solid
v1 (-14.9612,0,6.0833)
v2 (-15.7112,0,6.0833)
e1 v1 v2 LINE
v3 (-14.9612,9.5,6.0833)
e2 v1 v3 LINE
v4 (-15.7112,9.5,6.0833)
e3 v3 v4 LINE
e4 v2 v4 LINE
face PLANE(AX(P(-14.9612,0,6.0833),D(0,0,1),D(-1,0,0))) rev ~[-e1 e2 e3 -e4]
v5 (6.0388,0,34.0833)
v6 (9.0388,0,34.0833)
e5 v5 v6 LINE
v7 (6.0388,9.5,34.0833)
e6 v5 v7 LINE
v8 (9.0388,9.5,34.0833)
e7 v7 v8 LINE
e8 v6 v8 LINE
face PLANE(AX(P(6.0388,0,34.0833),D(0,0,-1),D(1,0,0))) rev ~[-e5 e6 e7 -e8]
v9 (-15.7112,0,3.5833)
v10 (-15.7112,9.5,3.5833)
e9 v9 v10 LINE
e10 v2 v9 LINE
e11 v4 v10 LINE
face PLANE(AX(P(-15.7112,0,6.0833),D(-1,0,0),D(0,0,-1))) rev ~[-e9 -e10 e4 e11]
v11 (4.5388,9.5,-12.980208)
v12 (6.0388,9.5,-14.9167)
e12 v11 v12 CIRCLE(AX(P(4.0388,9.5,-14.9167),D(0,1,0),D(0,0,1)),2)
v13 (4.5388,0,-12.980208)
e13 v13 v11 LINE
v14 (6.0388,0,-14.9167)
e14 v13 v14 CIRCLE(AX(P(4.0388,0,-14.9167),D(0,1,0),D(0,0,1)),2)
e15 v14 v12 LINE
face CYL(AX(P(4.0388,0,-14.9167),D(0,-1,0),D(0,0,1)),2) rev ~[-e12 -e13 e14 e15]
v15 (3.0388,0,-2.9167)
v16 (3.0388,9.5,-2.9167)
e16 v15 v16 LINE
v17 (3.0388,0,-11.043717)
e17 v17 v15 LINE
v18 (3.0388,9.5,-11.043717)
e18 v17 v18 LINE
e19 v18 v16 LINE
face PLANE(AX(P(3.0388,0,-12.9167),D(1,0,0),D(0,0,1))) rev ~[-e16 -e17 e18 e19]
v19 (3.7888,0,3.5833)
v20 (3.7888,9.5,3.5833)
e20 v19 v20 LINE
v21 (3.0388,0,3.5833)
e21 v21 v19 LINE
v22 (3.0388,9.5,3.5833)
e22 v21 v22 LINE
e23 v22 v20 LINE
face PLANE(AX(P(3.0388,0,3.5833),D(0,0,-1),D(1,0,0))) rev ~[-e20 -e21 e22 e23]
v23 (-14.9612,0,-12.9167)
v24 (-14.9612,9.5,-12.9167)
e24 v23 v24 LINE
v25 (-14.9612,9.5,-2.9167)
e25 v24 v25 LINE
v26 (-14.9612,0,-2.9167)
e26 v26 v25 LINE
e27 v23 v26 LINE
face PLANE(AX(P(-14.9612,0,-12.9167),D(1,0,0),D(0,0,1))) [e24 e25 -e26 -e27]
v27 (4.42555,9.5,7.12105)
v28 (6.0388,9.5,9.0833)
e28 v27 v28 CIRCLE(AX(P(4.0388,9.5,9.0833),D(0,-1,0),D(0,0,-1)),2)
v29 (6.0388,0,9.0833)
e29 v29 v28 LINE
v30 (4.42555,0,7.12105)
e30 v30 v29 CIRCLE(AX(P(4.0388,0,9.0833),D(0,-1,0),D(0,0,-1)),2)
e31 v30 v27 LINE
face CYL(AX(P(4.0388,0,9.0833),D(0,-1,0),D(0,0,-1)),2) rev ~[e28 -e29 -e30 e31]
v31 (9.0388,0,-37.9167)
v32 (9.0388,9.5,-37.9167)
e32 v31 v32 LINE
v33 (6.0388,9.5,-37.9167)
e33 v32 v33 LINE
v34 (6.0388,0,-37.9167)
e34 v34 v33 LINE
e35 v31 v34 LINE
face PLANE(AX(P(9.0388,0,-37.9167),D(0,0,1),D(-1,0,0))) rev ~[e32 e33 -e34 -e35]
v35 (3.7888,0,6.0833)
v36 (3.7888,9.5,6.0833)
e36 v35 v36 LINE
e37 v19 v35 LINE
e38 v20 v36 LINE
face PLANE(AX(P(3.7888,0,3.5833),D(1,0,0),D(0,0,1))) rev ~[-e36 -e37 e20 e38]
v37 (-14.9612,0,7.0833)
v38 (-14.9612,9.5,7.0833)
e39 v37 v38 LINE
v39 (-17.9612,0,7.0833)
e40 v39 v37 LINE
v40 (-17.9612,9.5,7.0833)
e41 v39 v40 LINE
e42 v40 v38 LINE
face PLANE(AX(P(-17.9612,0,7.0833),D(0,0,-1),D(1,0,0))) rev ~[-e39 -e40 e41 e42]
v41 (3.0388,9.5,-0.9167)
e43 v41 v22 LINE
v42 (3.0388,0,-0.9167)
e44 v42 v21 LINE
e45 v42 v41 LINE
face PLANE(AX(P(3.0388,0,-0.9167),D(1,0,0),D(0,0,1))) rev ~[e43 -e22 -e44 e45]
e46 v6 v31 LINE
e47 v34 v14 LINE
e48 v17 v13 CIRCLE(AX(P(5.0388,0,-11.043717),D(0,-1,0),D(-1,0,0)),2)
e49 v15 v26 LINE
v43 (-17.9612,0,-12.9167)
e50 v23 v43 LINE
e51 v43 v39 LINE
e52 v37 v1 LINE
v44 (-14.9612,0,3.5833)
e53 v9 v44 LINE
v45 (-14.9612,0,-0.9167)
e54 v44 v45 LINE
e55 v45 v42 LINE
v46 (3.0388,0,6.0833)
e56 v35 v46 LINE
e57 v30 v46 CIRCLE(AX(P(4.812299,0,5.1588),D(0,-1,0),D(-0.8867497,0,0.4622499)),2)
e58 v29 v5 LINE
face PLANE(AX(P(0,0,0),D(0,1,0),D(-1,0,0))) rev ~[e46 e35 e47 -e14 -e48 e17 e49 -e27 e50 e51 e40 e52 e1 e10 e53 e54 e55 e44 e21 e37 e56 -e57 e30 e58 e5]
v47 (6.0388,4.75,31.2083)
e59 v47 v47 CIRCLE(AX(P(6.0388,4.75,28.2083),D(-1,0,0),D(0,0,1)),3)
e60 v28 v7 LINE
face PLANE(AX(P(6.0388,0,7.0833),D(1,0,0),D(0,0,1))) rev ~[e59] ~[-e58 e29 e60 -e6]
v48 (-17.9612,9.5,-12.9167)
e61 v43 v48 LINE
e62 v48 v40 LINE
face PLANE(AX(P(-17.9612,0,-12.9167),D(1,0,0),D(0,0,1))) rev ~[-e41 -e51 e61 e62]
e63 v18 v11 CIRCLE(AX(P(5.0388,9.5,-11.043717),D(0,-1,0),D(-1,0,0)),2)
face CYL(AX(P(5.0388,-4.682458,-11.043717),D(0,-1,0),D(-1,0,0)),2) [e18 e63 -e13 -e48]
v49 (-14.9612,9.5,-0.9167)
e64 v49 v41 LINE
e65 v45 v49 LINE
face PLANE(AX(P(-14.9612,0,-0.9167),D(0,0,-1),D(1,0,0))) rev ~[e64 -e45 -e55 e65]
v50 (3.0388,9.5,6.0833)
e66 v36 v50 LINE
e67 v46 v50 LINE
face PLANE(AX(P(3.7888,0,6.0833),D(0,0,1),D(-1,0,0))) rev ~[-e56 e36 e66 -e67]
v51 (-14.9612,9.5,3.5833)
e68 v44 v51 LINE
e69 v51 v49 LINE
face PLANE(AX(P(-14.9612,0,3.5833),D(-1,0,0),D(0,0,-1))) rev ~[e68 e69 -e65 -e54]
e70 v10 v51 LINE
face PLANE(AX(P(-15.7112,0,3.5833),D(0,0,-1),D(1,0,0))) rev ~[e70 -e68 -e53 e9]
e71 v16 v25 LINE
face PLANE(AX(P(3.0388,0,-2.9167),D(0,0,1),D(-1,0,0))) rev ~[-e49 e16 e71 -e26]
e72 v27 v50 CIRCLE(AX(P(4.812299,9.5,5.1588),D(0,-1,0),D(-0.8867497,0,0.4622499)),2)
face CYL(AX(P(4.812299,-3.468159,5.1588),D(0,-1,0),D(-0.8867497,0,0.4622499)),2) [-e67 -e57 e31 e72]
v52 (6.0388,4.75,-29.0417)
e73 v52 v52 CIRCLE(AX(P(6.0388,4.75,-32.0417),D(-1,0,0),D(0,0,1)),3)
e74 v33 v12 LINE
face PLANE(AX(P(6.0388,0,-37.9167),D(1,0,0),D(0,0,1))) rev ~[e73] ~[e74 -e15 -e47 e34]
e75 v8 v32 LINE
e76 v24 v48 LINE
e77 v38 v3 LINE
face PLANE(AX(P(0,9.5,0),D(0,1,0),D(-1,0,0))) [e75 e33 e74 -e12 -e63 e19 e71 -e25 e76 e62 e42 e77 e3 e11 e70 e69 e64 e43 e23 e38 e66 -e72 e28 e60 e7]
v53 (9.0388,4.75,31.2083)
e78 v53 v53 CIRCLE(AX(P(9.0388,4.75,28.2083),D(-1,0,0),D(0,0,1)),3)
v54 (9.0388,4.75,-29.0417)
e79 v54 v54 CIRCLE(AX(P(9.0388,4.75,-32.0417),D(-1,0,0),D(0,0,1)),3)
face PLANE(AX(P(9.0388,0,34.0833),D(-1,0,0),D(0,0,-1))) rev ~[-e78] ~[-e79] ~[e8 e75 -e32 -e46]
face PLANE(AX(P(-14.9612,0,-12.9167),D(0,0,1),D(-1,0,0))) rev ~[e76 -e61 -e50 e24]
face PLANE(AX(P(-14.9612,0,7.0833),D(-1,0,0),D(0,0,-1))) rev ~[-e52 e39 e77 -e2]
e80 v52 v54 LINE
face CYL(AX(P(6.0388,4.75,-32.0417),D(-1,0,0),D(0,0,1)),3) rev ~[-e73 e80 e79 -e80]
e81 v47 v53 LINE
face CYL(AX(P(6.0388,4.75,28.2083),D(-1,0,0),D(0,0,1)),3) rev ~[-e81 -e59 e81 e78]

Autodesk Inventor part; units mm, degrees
ref_plane "YZ Plane" through (0, 0, 0) normal (1, 0, 0) x (0, 1, 0)
ref_plane "XZ Plane" through (0, 0, 0) normal (0, 1, 0) x (-1, 0, 0)
ref_plane "XY Plane" through (0, 0, 0) normal (0, 0, 1) x (1, 0, 0)
sketch "Sketch1" plane through (0, 0, 0) normal (0, 1, 0) x (-1, 0, 0)
  line L0 (-3.0388, 7.0833) -> (-6.0388, 7.0833)
  line L1 (-6.0388, 7.0833) -> (-6.0388, -12.9167)
  line L2 (-6.0388, -12.9167) -> (-3.0388, -12.9167)
  line L3 (-3.0388, -12.9167) -> (-3.0388, -2.9167)
  line L4 (-3.0388, -2.9167) -> (14.9612, -2.9167)
  line L5 (14.9612, -12.9167) -> (17.9612, -12.9167)
  line L6 (17.9612, -12.9167) -> (17.9612, 7.0833)
  line L7 (17.9612, 7.0833) -> (14.9612, 7.0833)
  line L8 (14.9612, 7.0833) -> (14.9612, 6.0833)
  line L9 (14.9612, 6.0833) -> (15.7112, 6.0833)
  line L10 (15.7112, 6.0833) -> (15.7112, 3.5833)
  line L11 (15.7112, 3.5833) -> (14.9612, 3.5833)
  line L12 (14.9612, 3.5833) -> (14.9612, -0.9167)
  line L13 (14.9612, -0.9167) -> (-3.0388, -0.9167)
  line L14 (-3.0388, -0.9167) -> (-3.0388, 3.5833)
  line L15 (-3.7888, 3.5833) -> (-3.7888, 6.0833)
  line L16 (-3.7888, 6.0833) -> (-3.0388, 6.0833)
  line L17 (-3.0388, 3.5833) -> (-3.7888, 3.5833)
  line L18 (-3.0388, 6.0833) -> (-3.0388, 7.0833)
  line L19 (14.9612, -12.9167) -> (14.9612, -2.9167)
  line L20 (-6.0388, 7.0833) -> (-6.0388, 34.0833)
  line L21 (-6.0388, 34.0833) -> (-9.0388, 34.0833)
  line L22 (-9.0388, 34.0833) -> (-9.0388, -37.9167)
  line L23 (-9.0388, -37.9167) -> (-6.0388, -37.9167)
  line L24 (-6.0388, -37.9167) -> (-6.0388, -12.9167)
  point P0 (0, 0)
  point P1 (14.9612, 1.3333)
  dimension "d0" = 2.5
  dimension "d1" = 3
  dimension "d2" = 3
  dimension "d3" = 10
  dimension "d4" = 10
  dimension "d5" = 2
  dimension "d6" = 3
  dimension "d8" = 1
  dimension "d9" = 8
  dimension "d11" = 0.75
  dimension "d12" = 0.75
  dimension "d13" = 3
  dimension "d16" = 18
  dimension "d17" = 3
  dimension "d18" = 72
  dimension "d19" = 35
extrude "Extrusion1" add sketch "Sketch1" along normal blind 9.5
fillet "Fillet1" radius 2 4 edges at (6.0388, 4.75, 7.0833) (6.0388, 4.75, -12.9167) (3.0388, 4.75, -12.9167) (3.0388, 4.75, 7.0833)
sketch "Sketch2" plane through (6.0388, 0, 34.0833) normal (-1, 0, 0) x (0, 0, 1)
  circle A0 centre (-5.875, 4.75) radius 3
  circle A1 centre (-66.125, 4.75) radius 3
  line L0 (-72, 0) -> (-49, 0) projected
  line L1 (-72, 9.5) -> (-49, 9.5) projected
  line L2 (-25, 9.5) -> (0, 9.5) projected
  line L3 (0, 0) -> (0, 9.5) projected
  line L4 (-72, 0) -> (-72, 9.5) projected
  point P0 (-34.0833, 0)
  dimension "d21" = 6
  dimension "d22" = 6
  dimension "d23" = 9.5
  dimension "d24" = 4.75
  dimension "d25" = 4.75
  dimension "d26" = 60.25
  dimension "d27" = 72
  dimension "d28" = 5.875
extrude "Extrusion2" cut sketch "Sketch2" against normal through all
equation "\"d2\" = d1"
equation "\"d4\" = d3"
equation "\"d6\" = d2"
equation "\"d12\" = d11"
equation "\"d13\" = d1"
equation "\"d19\" = -0.5 * d5 + 0.5 * d18"
equation "\"d24\" = 0.5 * d23"
equation "\"d25\" = 0.5 * d23"
equation "\"d28\" = -0.5 * d26 + 0.5 * d27"
properties part number "CO-1-02-stepperControllerMount"
